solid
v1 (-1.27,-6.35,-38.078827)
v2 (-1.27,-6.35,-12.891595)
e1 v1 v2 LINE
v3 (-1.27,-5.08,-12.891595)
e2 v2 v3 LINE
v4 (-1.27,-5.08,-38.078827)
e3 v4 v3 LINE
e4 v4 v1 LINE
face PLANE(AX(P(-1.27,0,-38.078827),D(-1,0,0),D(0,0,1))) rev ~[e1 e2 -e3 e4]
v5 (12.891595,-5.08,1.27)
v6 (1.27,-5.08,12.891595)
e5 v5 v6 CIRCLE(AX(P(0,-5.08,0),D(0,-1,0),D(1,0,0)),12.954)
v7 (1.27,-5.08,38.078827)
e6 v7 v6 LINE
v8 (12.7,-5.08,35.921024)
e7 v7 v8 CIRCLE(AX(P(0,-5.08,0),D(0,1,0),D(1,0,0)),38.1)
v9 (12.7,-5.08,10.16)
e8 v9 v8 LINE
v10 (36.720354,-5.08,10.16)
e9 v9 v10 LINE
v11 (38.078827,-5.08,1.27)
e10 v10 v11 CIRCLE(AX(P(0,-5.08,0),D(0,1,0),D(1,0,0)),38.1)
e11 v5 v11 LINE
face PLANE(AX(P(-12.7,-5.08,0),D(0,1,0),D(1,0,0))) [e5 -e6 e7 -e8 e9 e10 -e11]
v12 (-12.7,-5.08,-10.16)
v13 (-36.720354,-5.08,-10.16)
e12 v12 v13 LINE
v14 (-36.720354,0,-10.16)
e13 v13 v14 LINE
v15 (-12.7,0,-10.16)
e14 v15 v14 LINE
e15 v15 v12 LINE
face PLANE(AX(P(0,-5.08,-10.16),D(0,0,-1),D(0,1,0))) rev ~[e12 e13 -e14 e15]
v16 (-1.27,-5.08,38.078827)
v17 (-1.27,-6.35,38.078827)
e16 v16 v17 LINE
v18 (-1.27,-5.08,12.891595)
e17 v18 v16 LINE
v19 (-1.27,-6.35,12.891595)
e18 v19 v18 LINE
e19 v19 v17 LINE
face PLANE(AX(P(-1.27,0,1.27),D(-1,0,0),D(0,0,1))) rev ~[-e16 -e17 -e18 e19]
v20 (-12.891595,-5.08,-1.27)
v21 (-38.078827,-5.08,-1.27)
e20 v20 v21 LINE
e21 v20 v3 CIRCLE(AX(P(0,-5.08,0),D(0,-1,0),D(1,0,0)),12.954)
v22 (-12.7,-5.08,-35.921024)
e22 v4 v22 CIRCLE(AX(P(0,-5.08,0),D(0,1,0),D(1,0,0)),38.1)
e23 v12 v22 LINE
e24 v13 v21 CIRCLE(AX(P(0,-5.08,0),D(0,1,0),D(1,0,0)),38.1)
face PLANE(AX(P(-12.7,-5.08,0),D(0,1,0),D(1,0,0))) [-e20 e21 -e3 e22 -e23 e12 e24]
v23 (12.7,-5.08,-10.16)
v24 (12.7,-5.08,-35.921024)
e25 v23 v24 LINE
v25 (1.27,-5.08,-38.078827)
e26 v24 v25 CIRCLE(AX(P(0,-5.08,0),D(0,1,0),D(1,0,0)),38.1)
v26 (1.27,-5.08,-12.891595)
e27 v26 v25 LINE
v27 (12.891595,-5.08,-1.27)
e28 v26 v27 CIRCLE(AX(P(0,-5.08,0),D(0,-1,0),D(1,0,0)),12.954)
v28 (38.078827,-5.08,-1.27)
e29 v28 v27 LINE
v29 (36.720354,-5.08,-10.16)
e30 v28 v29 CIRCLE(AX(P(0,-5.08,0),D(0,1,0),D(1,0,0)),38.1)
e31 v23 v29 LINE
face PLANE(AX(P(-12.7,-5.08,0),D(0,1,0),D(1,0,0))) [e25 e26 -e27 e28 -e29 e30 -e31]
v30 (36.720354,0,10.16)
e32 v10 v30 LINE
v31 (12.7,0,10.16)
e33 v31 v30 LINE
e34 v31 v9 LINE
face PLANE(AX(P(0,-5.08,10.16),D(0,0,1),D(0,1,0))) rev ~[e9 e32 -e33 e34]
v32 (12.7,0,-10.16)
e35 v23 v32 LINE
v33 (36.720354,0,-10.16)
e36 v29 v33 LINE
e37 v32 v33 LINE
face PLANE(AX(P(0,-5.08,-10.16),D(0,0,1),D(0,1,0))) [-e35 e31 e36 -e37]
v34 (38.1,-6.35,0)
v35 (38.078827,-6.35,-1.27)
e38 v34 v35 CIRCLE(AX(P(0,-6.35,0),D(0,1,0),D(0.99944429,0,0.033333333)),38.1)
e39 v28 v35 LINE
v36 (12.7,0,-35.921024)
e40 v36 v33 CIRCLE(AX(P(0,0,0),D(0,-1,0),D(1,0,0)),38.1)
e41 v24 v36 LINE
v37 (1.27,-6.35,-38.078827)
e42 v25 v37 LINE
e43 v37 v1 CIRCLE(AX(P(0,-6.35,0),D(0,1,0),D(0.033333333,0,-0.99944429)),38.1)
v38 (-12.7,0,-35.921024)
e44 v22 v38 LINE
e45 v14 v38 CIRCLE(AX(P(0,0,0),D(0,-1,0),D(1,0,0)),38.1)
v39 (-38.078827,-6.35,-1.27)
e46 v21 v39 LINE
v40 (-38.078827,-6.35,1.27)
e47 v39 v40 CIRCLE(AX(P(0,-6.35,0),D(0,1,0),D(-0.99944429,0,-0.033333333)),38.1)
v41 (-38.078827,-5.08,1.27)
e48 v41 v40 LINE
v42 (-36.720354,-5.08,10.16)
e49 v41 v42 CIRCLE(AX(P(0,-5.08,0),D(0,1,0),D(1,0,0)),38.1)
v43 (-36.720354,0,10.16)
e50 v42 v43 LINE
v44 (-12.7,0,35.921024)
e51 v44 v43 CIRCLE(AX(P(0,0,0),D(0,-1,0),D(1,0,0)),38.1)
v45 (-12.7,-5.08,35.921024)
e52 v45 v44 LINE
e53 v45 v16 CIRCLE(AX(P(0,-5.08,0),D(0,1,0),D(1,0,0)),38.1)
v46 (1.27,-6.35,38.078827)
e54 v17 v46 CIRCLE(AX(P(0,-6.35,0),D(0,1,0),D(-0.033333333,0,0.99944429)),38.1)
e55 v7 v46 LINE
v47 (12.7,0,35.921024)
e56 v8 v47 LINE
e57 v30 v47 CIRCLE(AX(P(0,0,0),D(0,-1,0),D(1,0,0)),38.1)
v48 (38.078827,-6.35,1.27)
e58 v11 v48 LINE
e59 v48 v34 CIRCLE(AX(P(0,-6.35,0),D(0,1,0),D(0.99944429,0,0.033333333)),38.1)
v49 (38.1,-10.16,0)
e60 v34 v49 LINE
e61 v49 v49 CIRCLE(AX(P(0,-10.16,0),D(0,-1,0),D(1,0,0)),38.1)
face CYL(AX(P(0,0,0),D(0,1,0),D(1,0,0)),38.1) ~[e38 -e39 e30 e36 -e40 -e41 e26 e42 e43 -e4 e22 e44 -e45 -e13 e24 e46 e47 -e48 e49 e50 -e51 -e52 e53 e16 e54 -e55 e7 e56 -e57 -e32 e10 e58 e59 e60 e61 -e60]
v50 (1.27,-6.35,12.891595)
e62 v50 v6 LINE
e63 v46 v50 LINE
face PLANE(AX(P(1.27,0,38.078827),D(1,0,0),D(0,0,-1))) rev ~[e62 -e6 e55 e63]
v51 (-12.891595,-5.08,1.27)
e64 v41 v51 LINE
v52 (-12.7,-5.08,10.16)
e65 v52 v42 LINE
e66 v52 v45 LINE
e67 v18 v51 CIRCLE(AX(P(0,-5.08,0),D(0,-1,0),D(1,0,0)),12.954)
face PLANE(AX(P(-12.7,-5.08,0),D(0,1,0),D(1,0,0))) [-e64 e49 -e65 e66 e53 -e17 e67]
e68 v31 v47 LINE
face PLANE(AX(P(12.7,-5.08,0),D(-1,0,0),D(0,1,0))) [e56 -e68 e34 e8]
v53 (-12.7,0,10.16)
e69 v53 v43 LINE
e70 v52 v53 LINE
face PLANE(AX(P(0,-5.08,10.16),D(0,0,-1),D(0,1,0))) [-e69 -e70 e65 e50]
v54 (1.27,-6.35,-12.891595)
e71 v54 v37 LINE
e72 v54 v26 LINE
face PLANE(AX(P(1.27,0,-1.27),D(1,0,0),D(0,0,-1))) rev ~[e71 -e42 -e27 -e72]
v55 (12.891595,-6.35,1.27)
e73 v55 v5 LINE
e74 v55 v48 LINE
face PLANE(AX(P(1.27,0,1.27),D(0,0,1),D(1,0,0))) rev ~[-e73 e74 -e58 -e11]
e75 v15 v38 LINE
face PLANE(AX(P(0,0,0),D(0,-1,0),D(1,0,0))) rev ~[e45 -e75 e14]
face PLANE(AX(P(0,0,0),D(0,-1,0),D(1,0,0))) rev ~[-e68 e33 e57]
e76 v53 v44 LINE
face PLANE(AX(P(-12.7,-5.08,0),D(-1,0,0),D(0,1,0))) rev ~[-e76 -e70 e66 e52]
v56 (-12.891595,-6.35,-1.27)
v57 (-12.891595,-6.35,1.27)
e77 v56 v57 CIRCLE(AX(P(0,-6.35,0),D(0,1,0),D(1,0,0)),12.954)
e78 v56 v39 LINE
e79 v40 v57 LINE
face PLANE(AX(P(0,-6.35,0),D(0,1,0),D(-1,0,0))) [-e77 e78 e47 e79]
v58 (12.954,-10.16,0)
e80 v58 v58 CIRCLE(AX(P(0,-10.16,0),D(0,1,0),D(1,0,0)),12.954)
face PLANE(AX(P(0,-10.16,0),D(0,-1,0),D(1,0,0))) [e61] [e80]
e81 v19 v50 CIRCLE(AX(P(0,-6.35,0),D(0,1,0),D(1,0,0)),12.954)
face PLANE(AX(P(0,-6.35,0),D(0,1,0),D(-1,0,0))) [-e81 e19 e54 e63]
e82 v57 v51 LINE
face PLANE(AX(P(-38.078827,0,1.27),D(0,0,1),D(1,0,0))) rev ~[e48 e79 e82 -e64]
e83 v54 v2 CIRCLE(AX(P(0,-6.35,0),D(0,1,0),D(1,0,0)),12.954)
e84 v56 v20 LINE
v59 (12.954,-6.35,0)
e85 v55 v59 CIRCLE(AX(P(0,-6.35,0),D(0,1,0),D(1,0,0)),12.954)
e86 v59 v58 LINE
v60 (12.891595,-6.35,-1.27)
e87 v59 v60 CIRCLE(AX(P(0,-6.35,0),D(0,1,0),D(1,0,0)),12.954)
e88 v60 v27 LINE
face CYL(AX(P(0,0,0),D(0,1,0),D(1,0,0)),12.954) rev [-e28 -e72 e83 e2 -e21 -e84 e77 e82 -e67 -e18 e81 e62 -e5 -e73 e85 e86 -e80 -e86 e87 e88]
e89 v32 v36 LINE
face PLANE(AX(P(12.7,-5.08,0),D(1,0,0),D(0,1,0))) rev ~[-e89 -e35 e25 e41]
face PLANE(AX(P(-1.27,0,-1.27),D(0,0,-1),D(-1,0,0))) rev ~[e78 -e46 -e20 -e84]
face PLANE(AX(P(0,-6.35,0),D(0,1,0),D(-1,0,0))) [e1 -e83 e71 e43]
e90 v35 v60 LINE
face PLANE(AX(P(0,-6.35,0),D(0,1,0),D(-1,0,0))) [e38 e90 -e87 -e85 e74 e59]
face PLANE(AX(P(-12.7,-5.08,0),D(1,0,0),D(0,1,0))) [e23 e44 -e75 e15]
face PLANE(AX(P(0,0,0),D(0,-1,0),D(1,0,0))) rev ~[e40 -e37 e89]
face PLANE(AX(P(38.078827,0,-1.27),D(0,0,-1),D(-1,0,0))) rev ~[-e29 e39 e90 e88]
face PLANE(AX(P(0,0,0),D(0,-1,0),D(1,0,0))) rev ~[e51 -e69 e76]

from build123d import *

# Parameters (mm, degrees)
F0_R          = 12.7
F1_DEPTH      = 17.78
F2_R          = 38.1
F3_DEPTH      = 10.16
F4_R          = 12.954
F5_DEPTH      = 17.781
F5_DEPTH_BACK = 115
F6_W          = 5.08
F6_H          = 20.32
F7_DEPTH      = 38.101
F7_DEPTH_BACK = 38.101
F8_W          = 25.4
F8_H          = 5.08
F9_DEPTH      = 38.101
F9_DEPTH_BACK = 38.101
F11_DEPTH     = 6.35


# Not quite as in the source:
# - an extrude ends at something that could not be found from the text; its depth is read off the source's solid


with BuildPart() as f1:
    # F0 (on Front) → F1 (new body)
    with BuildSketch(Plane.XZ):
        Circle(F0_R)
    extrude(amount=F1_DEPTH)

    # F2 (on Front) → F3 (join)
    with BuildSketch(Plane.XZ):
        Circle(F2_R)
    extrude(amount=F3_DEPTH)

    # F4 (on Front) → F5 (cut, two sides)
    with BuildSketch(Plane.XZ) as f5_sk:
        Circle(F4_R)
    extrude(amount=F5_DEPTH, mode=Mode.SUBTRACT)
    extrude(f5_sk.sketch, amount=-F5_DEPTH_BACK, mode=Mode.SUBTRACT)

    # F6 (on Right) → F7 (cut, two sides)
    with BuildSketch(Plane.YZ) as f7_sk:
        with Locations((-2.54, 0)):
            Rectangle(F6_W, F6_H)
    extrude(amount=F7_DEPTH, mode=Mode.SUBTRACT)
    extrude(f7_sk.sketch, amount=-F7_DEPTH_BACK, mode=Mode.SUBTRACT)

    # F8 (on Top) → F9 (cut, two sides)
    with BuildSketch(Plane.XY) as f9_sk:
        with Locations((0, -2.54)):
            Rectangle(F8_W, F8_H)
    extrude(amount=-F9_DEPTH, mode=Mode.SUBTRACT)
    extrude(f9_sk.sketch, amount=F9_DEPTH_BACK, mode=Mode.SUBTRACT)

    # F10 (on face) → F11 (cut)
    with BuildSketch(Plane(origin=(0, 0, 0), x_dir=(-1, 0, 0), z_dir=(0, 1, 0))):
        with BuildLine():
            Line((1.27, -1.27), (38.0788274504, -1.27))
            ThreePointArc((38.0788274504, -1.27), (38.1, 0), (38.0788274504, 1.27))
            Line((38.0788274504, 1.27), (1.27, 1.27))
            Line((1.27, 1.27), (1.27, 38.0788274504))
            ThreePointArc((1.27, 38.0788274504), (0, 38.1), (-1.27, 38.0788274504))
            Line((-1.27, 38.0788274504), (-1.27, 1.27))
            Line((-1.27, 1.27), (-38.0788274504, 1.27))
            ThreePointArc((-38.0788274504, 1.27), (-38.1, 0), (-38.0788274504, -1.27))
            Line((-38.0788274504, -1.27), (-1.27, -1.27))
            Line((-1.27, -1.27), (-1.27, -38.0788274504))
            ThreePointArc((-1.27, -38.0788274504), (0, -38.1), (1.27, -38.0788274504))
            Line((1.27, -38.0788274504), (1.27, -1.27))
        make_face()
    extrude(amount=-F11_DEPTH, mode=Mode.SUBTRACT)


solid = f1.part
